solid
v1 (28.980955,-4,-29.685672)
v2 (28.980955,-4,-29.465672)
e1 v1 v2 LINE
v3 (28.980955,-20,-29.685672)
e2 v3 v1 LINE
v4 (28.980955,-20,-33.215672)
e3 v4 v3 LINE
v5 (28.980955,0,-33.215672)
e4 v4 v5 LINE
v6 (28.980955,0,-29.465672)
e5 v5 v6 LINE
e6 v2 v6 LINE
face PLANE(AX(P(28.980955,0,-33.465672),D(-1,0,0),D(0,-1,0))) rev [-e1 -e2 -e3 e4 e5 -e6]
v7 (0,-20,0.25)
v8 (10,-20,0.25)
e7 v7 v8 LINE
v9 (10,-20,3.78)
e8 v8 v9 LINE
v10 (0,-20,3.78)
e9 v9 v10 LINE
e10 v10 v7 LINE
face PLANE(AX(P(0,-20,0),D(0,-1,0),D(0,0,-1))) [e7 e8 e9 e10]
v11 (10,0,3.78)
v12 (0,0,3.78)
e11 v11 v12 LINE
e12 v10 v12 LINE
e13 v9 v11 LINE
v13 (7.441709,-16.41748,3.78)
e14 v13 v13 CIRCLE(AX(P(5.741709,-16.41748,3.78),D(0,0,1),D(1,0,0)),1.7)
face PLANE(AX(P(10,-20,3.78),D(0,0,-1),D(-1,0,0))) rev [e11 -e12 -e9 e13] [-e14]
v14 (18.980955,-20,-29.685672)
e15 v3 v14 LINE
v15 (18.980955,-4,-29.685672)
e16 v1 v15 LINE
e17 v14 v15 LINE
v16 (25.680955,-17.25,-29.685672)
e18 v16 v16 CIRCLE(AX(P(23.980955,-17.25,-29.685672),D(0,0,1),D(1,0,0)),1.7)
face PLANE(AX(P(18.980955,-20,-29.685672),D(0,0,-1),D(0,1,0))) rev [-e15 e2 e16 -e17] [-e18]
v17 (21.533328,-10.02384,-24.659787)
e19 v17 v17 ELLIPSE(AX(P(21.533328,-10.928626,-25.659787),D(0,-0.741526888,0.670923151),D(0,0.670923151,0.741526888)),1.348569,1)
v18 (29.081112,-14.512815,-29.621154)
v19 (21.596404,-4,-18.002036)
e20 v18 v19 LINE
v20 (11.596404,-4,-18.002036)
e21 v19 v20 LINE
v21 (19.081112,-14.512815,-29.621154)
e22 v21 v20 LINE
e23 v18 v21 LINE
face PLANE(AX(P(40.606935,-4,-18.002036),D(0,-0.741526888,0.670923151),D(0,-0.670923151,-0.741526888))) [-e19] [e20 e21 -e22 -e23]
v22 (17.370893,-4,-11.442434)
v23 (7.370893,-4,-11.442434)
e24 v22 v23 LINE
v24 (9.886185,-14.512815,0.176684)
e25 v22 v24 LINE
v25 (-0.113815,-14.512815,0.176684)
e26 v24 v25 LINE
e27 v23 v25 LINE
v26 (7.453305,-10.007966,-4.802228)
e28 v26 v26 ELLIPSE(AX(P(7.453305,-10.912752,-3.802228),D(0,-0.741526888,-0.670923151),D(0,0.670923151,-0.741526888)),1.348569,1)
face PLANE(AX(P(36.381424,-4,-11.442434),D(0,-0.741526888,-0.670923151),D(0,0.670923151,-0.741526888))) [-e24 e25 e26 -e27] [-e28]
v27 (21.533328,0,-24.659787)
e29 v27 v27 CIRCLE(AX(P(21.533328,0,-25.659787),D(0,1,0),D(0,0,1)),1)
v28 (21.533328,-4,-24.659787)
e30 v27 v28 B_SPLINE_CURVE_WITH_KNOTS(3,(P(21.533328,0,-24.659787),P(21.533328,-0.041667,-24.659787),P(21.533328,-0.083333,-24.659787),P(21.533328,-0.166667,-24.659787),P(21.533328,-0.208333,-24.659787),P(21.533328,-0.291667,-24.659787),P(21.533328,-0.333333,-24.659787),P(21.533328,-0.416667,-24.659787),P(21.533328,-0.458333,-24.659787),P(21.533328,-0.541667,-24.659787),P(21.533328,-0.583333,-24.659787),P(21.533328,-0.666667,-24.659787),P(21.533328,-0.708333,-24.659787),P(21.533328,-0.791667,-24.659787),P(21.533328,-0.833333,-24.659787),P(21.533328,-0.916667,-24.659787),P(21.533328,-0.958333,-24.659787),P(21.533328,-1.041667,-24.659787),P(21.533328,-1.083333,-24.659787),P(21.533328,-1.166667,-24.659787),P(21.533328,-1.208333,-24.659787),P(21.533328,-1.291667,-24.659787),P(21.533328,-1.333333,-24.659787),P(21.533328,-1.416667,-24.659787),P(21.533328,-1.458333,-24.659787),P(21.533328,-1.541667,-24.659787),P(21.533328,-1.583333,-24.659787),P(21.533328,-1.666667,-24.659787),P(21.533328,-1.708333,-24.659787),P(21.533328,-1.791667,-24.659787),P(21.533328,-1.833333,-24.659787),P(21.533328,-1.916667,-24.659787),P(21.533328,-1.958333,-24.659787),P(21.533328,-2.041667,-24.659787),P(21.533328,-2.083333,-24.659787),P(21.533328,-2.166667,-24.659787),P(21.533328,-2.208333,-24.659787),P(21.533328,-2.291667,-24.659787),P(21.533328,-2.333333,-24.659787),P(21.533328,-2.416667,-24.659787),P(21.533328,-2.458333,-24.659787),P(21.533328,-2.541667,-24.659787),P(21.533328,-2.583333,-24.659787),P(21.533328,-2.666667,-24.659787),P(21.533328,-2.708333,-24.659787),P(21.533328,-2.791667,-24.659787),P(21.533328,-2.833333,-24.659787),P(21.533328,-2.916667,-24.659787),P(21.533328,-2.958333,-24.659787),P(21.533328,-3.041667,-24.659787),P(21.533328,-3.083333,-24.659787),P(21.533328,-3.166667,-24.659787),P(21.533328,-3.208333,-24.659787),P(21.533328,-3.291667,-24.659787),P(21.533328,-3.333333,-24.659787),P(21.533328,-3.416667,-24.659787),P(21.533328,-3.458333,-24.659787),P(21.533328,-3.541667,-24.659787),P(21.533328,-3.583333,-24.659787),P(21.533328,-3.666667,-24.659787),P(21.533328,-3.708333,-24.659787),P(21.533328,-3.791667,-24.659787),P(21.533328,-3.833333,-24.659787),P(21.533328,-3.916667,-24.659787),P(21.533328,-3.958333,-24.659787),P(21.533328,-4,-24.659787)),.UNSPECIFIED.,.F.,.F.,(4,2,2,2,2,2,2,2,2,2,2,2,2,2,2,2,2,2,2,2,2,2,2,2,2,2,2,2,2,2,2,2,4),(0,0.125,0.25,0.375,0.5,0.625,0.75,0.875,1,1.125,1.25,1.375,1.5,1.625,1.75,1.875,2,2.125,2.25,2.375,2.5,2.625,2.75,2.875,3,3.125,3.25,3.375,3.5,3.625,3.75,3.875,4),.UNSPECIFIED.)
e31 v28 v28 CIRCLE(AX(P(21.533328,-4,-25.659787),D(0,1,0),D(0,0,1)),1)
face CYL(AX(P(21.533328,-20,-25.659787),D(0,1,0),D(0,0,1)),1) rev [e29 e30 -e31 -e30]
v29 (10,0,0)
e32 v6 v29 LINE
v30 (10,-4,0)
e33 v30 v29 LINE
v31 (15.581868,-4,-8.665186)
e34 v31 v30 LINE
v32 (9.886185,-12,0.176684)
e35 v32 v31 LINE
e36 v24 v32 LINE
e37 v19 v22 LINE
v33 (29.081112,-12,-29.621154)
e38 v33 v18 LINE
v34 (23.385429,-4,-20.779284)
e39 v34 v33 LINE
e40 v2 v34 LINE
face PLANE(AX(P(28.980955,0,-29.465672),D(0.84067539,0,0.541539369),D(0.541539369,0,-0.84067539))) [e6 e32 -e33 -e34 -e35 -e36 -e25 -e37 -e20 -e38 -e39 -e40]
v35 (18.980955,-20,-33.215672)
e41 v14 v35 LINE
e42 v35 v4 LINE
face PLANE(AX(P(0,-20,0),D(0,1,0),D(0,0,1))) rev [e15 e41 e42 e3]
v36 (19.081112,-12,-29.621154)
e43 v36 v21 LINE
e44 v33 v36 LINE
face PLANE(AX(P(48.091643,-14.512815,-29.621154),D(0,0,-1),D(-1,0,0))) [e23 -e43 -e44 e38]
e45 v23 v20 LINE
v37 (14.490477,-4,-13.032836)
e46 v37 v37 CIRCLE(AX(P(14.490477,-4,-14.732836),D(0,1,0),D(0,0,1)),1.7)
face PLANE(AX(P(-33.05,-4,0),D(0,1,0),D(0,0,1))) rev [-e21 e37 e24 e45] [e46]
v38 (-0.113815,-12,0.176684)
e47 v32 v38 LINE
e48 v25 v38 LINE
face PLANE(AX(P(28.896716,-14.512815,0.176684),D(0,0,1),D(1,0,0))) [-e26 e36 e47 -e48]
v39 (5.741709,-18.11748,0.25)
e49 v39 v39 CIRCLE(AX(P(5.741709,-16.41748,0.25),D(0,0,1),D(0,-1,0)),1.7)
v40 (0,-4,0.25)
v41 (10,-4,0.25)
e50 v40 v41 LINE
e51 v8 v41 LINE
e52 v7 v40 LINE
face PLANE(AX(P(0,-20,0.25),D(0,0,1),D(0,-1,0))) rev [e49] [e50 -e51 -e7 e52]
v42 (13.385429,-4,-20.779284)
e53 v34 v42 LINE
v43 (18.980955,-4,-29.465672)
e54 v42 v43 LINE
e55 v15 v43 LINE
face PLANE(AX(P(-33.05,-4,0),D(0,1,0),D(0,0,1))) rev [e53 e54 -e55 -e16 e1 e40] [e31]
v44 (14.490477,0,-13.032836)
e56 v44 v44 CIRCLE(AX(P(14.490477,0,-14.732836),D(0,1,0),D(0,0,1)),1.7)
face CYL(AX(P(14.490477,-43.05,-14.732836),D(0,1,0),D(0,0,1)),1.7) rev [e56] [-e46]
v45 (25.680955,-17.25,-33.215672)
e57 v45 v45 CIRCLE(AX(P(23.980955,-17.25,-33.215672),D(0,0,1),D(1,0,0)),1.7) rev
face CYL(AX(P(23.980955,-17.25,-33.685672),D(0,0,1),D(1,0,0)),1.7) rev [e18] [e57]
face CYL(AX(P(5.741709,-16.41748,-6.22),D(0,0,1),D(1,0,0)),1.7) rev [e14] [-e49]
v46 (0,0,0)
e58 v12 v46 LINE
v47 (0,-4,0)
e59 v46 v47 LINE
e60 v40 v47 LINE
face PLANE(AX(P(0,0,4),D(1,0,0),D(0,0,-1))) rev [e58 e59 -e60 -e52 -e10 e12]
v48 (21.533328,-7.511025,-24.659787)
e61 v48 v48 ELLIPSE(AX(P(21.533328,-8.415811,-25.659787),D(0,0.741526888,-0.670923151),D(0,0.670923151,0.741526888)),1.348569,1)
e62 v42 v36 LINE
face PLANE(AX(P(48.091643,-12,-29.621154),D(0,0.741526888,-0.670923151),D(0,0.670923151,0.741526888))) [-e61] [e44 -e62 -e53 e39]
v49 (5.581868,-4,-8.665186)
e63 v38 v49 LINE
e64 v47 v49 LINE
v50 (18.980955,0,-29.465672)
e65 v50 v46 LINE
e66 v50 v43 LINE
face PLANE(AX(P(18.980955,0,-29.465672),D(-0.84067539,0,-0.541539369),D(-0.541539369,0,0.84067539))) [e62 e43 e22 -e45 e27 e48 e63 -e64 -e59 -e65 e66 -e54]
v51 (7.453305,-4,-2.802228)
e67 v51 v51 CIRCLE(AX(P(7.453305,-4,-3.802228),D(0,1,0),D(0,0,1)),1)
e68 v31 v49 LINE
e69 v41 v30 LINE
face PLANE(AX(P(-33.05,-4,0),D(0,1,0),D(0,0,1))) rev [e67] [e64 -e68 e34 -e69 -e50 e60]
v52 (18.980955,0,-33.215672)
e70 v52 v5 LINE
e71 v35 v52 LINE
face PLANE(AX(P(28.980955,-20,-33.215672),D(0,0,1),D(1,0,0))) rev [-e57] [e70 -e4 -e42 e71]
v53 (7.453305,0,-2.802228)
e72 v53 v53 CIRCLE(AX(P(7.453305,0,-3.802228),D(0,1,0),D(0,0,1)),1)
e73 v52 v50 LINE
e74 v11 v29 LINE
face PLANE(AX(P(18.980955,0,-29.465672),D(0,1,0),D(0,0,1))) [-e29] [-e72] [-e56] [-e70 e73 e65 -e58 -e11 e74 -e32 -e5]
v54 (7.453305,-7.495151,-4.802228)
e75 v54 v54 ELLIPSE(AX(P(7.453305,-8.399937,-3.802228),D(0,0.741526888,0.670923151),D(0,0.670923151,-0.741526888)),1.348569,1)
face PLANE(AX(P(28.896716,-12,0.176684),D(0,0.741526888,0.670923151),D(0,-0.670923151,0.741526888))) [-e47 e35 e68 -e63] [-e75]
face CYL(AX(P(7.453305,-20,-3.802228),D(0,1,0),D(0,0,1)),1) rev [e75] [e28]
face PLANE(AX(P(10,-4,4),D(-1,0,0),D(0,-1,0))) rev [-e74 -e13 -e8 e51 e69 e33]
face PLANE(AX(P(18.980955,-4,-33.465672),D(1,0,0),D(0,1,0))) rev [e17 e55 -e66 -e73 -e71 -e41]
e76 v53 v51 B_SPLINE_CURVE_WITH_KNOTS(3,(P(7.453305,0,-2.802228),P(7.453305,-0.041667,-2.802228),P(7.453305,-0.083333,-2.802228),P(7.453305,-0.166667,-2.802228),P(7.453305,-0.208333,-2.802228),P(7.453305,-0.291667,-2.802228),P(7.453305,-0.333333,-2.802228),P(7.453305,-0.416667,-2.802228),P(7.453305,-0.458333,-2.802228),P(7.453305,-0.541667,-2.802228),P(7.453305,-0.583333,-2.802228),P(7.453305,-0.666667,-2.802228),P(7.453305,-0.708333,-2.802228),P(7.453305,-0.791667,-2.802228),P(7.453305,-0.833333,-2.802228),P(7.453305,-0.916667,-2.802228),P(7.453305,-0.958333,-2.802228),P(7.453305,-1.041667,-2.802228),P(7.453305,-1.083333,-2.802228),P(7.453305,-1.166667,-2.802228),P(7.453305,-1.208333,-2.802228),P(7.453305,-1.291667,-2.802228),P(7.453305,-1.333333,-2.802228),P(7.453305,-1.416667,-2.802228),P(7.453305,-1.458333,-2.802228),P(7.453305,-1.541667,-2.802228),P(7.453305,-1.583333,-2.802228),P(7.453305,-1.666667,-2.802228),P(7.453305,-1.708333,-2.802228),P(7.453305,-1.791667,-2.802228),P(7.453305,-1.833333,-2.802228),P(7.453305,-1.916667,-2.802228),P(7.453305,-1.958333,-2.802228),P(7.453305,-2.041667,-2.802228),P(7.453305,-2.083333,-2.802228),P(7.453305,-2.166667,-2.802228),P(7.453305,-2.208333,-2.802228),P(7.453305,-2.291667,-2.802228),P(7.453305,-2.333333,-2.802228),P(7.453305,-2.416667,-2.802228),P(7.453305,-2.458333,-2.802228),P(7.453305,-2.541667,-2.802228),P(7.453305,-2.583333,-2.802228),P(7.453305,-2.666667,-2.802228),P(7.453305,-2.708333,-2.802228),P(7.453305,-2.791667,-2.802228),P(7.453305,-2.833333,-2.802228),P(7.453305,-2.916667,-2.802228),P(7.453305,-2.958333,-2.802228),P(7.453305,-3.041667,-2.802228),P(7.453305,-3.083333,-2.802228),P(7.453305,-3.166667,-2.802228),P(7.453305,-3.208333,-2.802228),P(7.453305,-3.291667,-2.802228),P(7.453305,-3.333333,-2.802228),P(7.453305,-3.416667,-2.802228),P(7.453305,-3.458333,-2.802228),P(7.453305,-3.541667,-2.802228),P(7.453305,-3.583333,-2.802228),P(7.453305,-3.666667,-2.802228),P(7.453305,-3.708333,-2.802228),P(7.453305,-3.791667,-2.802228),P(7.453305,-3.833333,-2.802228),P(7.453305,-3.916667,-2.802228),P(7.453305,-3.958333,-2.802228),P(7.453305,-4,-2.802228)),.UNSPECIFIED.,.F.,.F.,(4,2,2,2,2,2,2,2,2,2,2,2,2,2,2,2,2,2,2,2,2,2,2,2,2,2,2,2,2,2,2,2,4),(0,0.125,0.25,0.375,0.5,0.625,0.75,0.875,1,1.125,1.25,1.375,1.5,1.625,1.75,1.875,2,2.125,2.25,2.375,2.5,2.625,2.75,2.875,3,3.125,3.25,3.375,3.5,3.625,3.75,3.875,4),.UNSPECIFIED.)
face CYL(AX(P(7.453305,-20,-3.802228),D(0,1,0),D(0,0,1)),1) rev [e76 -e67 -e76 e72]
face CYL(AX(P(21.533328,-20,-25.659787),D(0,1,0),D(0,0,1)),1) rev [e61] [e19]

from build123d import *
from build123d.topology import SkipClean

# Parameters (mm, degrees)
SCHIZZO9_W                          = 10
SCHIZZO9_H                          = 20
ESTRUSIONE_ESTRUSIONE5_DEPTH        = 35.05
SCHIZZO10_W                         = 35.05
SCHIZZO10_H                         = 16
TAGLIO_ESTRUSIONE1_DEPTH            = 43.05
SCHIZZO11_R                         = 1.7
TAGLIO_ESTRUSIONE2_DEPTH            = 43.05
SCHIZZO16_W                         = 10
SCHIZZO16_H                         = 4
ESTRUSIONE_ESTRUSIONE8_DEPTH        = 4
SCHIZZO17_W                         = 10
SCHIZZO17_H                         = 4
ESTRUSIONE_ESTRUSIONE9_DEPTH        = 4
ESTRUSIONE_ESTRUSIONE10_OUTLINE_W   = 10
ESTRUSIONE_ESTRUSIONE10_OUTLINE_H   = 3.78
ESTRUSIONE_ESTRUSIONE10_OUTLINE_H_2 = 3.75
ESTRUSIONE_ESTRUSIONE10_DEPTH       = 16
ESTRUSIONE_ESTRUSIONE11_DEPTH       = 10.000000119
ESTRUSIONE_ESTRUSIONE12_DEPTH       = 10.000000119
SCHIZZO21_R                         = 1.7
TAGLIO_ESTRUSIONE5_DEPTH            = 4
TAGLIO_ESTRUSIONE7_DEPTH            = 49.638074625
TAGLIO_ESTRUSIONE7_DEPTH_BACK       = 49.638074625
SCHIZZO23_R                         = 1
TAGLIO_ESTRUSIONE8_DEPTH            = 49.638074625
TAGLIO_ESTRUSIONE8_DEPTH_BACK       = 49.638074625
SCHIZZO24_W                         = 10
SCHIZZO24_H                         = 0.25
SCHIZZO24_H_2                       = 0.22
SCHIZZO25_R                         = 1.7
TAGLIO_ESTRUSIONE9_DEPTH            = 10


# Read off the part's stored shape, not the designer's step: Estrusione-Estrusione10
with BuildPart() as part:
    # Schizzo9 → Estrusione-Estrusione5 (new, along a direction that is not the sketch's normal)
    with BuildSketch(Plane.XY):
        with Locations((5, -10)):
            Rectangle(SCHIZZO9_W, SCHIZZO9_H)
    extrude(amount=-ESTRUSIONE_ESTRUSIONE5_DEPTH, dir=(-0.5415393694615634, 0, 0.8406753899830615))

    # Schizzo10 → Taglio-Estrusione1 (cut, along a direction that is not the sketch's normal)
    with BuildSketch(Plane(origin=(7.067351113, 0, 4.552588206), x_dir=(0.5415393694615636, 0, -0.8406753899830613), z_dir=(0.8406753899830615, 0, 0.5415393694615636))):
        with Locations((22.940393695, -12)):
            Rectangle(SCHIZZO10_W, SCHIZZO10_H)
    extrude(amount=-TAGLIO_ESTRUSIONE1_DEPTH, dir=(1, 0, 0), mode=Mode.SUBTRACT)

    # Schizzo11 → Taglio-Estrusione2 (cut)
    with BuildSketch(Plane(origin=(0, 0, 0), x_dir=(1, 0, 0), z_dir=(0, 1, 0))):
        with Locations(Location((14.49047745, 14.732836209, 0), (0, 0, 270))):
            Circle(SCHIZZO11_R)
    extrude(amount=-TAGLIO_ESTRUSIONE2_DEPTH, mode=Mode.SUBTRACT)

    # Schizzo16 → Estrusione-Estrusione8 (add)
    with BuildSketch(Plane(origin=(0, 0, -29.465672419), x_dir=(-1, 0, 0), z_dir=(0, 0, -1))):
        with Locations((-23.9809549, -2)):
            Rectangle(SCHIZZO16_W, SCHIZZO16_H)
    extrude(amount=ESTRUSIONE_ESTRUSIONE8_DEPTH)

    # Schizzo17 → Estrusione-Estrusione9 (add)
    with BuildSketch(Plane.XY):
        with Locations((5, -2)):
            Rectangle(SCHIZZO17_W, SCHIZZO17_H)
    extrude(amount=ESTRUSIONE_ESTRUSIONE9_DEPTH)

    # Estrusione-Estrusione10 outline → Estrusione-Estrusione10 (add)
    with BuildSketch(Plane.XZ.offset(4)):
        with Locations((23.9809549, -31.575672419)):
            Rectangle(ESTRUSIONE_ESTRUSIONE10_OUTLINE_W, ESTRUSIONE_ESTRUSIONE10_OUTLINE_H)
        with Locations((5, 2.125)):
            Rectangle(ESTRUSIONE_ESTRUSIONE10_OUTLINE_W, ESTRUSIONE_ESTRUSIONE10_OUTLINE_H_2)
    extrude(amount=ESTRUSIONE_ESTRUSIONE10_DEPTH)

    # Schizzo19 → Estrusione-Estrusione11 (add, along a direction that is not the sketch's normal)
    with BuildSketch(Plane(origin=(0, 0, 0), x_dir=(-0.5415393694615636, 0, 0.8406753899830613), z_dir=(-0.8406753899830615, 0, -0.5415393694615636))):
        Polygon((-35.234948586, -12), (-24.717369686, -4), (-21.413778213, -4), (-35.234948586, -14.512815167), align=None)
    extrude(amount=-ESTRUSIONE_ESTRUSIONE11_DEPTH, dir=(-1, 0, 0))

    # Schizzo20 → Estrusione-Estrusione12 (add, along a direction that is not the sketch's normal)
    with SkipClean():  # the faces are left unmerged after this step: merging them gives an invalid solid
        with BuildSketch(Plane(origin=(0, 0, 0), x_dir=(-0.5415393694615636, 0, 0.8406753899830613), z_dir=(-0.8406753899830615, 0, -0.5415393694615636))):
            Polygon((0.210168847, -12), (-10.307410052, -4), (-13.611001525, -4), (0.210168847, -14.512815167), align=None)
        extrude(amount=-ESTRUSIONE_ESTRUSIONE12_DEPTH, dir=(-1, 0, 0))

    # Schizzo21 → Taglio-Estrusione5 (cut)
    with SkipClean():  # the faces are left unmerged after this step: merging them gives an invalid solid
        with BuildSketch(Plane.XY.offset(-29.685672419)):
            with Locations((23.9809549, -17.25)):
                Circle(SCHIZZO21_R)
        extrude(amount=-TAGLIO_ESTRUSIONE5_DEPTH, mode=Mode.SUBTRACT)

    # Schizzo23 → Taglio-Estrusione7 (cut, two sides: drawn at the far end of the back side and taken through both)
    with SkipClean():  # the faces are left unmerged after this step: merging them gives an invalid solid
        with BuildSketch(Plane(origin=(0, 0, 0), x_dir=(1, 0, 0), z_dir=(0, 1, 0)).offset(-TAGLIO_ESTRUSIONE7_DEPTH_BACK)):
            with Locations(Location((7.453304803, 3.802227757, 0), (0, 0, 90))):
                Circle(SCHIZZO23_R)
            with Locations(Location((21.533327934, 25.659787159, 0), (0, 0, 270))):
                Circle(SCHIZZO23_R)
        extrude(amount=TAGLIO_ESTRUSIONE7_DEPTH + TAGLIO_ESTRUSIONE7_DEPTH_BACK, mode=Mode.SUBTRACT)

    # Schizzo24 → Taglio-Estrusione8 (cut, two sides: drawn at the far end of the back side and taken through both)
    with SkipClean():  # the faces are left unmerged after this step: merging them gives an invalid solid
        with BuildSketch(Plane(origin=(0, 0, 0), x_dir=(1, 0, 0), z_dir=(0, 1, 0)).offset(-TAGLIO_ESTRUSIONE8_DEPTH_BACK)):
            with Locations((23.9809549, 33.340672419)):
                Rectangle(SCHIZZO24_W, SCHIZZO24_H)
            with Locations((5, -3.89)):
                Rectangle(SCHIZZO24_W, SCHIZZO24_H_2)
        extrude(amount=TAGLIO_ESTRUSIONE8_DEPTH + TAGLIO_ESTRUSIONE8_DEPTH_BACK, mode=Mode.SUBTRACT)

    # Schizzo25 → Taglio-Estrusione9 (cut)
    with SkipClean():  # the faces are left unmerged after this step: merging them gives an invalid solid
        with BuildSketch(Plane.XY.offset(3.78)):
            with Locations((5.741708588, -16.417479931)):
                Circle(SCHIZZO25_R)
        extrude(amount=-TAGLIO_ESTRUSIONE9_DEPTH, mode=Mode.SUBTRACT)


solid = part.part
